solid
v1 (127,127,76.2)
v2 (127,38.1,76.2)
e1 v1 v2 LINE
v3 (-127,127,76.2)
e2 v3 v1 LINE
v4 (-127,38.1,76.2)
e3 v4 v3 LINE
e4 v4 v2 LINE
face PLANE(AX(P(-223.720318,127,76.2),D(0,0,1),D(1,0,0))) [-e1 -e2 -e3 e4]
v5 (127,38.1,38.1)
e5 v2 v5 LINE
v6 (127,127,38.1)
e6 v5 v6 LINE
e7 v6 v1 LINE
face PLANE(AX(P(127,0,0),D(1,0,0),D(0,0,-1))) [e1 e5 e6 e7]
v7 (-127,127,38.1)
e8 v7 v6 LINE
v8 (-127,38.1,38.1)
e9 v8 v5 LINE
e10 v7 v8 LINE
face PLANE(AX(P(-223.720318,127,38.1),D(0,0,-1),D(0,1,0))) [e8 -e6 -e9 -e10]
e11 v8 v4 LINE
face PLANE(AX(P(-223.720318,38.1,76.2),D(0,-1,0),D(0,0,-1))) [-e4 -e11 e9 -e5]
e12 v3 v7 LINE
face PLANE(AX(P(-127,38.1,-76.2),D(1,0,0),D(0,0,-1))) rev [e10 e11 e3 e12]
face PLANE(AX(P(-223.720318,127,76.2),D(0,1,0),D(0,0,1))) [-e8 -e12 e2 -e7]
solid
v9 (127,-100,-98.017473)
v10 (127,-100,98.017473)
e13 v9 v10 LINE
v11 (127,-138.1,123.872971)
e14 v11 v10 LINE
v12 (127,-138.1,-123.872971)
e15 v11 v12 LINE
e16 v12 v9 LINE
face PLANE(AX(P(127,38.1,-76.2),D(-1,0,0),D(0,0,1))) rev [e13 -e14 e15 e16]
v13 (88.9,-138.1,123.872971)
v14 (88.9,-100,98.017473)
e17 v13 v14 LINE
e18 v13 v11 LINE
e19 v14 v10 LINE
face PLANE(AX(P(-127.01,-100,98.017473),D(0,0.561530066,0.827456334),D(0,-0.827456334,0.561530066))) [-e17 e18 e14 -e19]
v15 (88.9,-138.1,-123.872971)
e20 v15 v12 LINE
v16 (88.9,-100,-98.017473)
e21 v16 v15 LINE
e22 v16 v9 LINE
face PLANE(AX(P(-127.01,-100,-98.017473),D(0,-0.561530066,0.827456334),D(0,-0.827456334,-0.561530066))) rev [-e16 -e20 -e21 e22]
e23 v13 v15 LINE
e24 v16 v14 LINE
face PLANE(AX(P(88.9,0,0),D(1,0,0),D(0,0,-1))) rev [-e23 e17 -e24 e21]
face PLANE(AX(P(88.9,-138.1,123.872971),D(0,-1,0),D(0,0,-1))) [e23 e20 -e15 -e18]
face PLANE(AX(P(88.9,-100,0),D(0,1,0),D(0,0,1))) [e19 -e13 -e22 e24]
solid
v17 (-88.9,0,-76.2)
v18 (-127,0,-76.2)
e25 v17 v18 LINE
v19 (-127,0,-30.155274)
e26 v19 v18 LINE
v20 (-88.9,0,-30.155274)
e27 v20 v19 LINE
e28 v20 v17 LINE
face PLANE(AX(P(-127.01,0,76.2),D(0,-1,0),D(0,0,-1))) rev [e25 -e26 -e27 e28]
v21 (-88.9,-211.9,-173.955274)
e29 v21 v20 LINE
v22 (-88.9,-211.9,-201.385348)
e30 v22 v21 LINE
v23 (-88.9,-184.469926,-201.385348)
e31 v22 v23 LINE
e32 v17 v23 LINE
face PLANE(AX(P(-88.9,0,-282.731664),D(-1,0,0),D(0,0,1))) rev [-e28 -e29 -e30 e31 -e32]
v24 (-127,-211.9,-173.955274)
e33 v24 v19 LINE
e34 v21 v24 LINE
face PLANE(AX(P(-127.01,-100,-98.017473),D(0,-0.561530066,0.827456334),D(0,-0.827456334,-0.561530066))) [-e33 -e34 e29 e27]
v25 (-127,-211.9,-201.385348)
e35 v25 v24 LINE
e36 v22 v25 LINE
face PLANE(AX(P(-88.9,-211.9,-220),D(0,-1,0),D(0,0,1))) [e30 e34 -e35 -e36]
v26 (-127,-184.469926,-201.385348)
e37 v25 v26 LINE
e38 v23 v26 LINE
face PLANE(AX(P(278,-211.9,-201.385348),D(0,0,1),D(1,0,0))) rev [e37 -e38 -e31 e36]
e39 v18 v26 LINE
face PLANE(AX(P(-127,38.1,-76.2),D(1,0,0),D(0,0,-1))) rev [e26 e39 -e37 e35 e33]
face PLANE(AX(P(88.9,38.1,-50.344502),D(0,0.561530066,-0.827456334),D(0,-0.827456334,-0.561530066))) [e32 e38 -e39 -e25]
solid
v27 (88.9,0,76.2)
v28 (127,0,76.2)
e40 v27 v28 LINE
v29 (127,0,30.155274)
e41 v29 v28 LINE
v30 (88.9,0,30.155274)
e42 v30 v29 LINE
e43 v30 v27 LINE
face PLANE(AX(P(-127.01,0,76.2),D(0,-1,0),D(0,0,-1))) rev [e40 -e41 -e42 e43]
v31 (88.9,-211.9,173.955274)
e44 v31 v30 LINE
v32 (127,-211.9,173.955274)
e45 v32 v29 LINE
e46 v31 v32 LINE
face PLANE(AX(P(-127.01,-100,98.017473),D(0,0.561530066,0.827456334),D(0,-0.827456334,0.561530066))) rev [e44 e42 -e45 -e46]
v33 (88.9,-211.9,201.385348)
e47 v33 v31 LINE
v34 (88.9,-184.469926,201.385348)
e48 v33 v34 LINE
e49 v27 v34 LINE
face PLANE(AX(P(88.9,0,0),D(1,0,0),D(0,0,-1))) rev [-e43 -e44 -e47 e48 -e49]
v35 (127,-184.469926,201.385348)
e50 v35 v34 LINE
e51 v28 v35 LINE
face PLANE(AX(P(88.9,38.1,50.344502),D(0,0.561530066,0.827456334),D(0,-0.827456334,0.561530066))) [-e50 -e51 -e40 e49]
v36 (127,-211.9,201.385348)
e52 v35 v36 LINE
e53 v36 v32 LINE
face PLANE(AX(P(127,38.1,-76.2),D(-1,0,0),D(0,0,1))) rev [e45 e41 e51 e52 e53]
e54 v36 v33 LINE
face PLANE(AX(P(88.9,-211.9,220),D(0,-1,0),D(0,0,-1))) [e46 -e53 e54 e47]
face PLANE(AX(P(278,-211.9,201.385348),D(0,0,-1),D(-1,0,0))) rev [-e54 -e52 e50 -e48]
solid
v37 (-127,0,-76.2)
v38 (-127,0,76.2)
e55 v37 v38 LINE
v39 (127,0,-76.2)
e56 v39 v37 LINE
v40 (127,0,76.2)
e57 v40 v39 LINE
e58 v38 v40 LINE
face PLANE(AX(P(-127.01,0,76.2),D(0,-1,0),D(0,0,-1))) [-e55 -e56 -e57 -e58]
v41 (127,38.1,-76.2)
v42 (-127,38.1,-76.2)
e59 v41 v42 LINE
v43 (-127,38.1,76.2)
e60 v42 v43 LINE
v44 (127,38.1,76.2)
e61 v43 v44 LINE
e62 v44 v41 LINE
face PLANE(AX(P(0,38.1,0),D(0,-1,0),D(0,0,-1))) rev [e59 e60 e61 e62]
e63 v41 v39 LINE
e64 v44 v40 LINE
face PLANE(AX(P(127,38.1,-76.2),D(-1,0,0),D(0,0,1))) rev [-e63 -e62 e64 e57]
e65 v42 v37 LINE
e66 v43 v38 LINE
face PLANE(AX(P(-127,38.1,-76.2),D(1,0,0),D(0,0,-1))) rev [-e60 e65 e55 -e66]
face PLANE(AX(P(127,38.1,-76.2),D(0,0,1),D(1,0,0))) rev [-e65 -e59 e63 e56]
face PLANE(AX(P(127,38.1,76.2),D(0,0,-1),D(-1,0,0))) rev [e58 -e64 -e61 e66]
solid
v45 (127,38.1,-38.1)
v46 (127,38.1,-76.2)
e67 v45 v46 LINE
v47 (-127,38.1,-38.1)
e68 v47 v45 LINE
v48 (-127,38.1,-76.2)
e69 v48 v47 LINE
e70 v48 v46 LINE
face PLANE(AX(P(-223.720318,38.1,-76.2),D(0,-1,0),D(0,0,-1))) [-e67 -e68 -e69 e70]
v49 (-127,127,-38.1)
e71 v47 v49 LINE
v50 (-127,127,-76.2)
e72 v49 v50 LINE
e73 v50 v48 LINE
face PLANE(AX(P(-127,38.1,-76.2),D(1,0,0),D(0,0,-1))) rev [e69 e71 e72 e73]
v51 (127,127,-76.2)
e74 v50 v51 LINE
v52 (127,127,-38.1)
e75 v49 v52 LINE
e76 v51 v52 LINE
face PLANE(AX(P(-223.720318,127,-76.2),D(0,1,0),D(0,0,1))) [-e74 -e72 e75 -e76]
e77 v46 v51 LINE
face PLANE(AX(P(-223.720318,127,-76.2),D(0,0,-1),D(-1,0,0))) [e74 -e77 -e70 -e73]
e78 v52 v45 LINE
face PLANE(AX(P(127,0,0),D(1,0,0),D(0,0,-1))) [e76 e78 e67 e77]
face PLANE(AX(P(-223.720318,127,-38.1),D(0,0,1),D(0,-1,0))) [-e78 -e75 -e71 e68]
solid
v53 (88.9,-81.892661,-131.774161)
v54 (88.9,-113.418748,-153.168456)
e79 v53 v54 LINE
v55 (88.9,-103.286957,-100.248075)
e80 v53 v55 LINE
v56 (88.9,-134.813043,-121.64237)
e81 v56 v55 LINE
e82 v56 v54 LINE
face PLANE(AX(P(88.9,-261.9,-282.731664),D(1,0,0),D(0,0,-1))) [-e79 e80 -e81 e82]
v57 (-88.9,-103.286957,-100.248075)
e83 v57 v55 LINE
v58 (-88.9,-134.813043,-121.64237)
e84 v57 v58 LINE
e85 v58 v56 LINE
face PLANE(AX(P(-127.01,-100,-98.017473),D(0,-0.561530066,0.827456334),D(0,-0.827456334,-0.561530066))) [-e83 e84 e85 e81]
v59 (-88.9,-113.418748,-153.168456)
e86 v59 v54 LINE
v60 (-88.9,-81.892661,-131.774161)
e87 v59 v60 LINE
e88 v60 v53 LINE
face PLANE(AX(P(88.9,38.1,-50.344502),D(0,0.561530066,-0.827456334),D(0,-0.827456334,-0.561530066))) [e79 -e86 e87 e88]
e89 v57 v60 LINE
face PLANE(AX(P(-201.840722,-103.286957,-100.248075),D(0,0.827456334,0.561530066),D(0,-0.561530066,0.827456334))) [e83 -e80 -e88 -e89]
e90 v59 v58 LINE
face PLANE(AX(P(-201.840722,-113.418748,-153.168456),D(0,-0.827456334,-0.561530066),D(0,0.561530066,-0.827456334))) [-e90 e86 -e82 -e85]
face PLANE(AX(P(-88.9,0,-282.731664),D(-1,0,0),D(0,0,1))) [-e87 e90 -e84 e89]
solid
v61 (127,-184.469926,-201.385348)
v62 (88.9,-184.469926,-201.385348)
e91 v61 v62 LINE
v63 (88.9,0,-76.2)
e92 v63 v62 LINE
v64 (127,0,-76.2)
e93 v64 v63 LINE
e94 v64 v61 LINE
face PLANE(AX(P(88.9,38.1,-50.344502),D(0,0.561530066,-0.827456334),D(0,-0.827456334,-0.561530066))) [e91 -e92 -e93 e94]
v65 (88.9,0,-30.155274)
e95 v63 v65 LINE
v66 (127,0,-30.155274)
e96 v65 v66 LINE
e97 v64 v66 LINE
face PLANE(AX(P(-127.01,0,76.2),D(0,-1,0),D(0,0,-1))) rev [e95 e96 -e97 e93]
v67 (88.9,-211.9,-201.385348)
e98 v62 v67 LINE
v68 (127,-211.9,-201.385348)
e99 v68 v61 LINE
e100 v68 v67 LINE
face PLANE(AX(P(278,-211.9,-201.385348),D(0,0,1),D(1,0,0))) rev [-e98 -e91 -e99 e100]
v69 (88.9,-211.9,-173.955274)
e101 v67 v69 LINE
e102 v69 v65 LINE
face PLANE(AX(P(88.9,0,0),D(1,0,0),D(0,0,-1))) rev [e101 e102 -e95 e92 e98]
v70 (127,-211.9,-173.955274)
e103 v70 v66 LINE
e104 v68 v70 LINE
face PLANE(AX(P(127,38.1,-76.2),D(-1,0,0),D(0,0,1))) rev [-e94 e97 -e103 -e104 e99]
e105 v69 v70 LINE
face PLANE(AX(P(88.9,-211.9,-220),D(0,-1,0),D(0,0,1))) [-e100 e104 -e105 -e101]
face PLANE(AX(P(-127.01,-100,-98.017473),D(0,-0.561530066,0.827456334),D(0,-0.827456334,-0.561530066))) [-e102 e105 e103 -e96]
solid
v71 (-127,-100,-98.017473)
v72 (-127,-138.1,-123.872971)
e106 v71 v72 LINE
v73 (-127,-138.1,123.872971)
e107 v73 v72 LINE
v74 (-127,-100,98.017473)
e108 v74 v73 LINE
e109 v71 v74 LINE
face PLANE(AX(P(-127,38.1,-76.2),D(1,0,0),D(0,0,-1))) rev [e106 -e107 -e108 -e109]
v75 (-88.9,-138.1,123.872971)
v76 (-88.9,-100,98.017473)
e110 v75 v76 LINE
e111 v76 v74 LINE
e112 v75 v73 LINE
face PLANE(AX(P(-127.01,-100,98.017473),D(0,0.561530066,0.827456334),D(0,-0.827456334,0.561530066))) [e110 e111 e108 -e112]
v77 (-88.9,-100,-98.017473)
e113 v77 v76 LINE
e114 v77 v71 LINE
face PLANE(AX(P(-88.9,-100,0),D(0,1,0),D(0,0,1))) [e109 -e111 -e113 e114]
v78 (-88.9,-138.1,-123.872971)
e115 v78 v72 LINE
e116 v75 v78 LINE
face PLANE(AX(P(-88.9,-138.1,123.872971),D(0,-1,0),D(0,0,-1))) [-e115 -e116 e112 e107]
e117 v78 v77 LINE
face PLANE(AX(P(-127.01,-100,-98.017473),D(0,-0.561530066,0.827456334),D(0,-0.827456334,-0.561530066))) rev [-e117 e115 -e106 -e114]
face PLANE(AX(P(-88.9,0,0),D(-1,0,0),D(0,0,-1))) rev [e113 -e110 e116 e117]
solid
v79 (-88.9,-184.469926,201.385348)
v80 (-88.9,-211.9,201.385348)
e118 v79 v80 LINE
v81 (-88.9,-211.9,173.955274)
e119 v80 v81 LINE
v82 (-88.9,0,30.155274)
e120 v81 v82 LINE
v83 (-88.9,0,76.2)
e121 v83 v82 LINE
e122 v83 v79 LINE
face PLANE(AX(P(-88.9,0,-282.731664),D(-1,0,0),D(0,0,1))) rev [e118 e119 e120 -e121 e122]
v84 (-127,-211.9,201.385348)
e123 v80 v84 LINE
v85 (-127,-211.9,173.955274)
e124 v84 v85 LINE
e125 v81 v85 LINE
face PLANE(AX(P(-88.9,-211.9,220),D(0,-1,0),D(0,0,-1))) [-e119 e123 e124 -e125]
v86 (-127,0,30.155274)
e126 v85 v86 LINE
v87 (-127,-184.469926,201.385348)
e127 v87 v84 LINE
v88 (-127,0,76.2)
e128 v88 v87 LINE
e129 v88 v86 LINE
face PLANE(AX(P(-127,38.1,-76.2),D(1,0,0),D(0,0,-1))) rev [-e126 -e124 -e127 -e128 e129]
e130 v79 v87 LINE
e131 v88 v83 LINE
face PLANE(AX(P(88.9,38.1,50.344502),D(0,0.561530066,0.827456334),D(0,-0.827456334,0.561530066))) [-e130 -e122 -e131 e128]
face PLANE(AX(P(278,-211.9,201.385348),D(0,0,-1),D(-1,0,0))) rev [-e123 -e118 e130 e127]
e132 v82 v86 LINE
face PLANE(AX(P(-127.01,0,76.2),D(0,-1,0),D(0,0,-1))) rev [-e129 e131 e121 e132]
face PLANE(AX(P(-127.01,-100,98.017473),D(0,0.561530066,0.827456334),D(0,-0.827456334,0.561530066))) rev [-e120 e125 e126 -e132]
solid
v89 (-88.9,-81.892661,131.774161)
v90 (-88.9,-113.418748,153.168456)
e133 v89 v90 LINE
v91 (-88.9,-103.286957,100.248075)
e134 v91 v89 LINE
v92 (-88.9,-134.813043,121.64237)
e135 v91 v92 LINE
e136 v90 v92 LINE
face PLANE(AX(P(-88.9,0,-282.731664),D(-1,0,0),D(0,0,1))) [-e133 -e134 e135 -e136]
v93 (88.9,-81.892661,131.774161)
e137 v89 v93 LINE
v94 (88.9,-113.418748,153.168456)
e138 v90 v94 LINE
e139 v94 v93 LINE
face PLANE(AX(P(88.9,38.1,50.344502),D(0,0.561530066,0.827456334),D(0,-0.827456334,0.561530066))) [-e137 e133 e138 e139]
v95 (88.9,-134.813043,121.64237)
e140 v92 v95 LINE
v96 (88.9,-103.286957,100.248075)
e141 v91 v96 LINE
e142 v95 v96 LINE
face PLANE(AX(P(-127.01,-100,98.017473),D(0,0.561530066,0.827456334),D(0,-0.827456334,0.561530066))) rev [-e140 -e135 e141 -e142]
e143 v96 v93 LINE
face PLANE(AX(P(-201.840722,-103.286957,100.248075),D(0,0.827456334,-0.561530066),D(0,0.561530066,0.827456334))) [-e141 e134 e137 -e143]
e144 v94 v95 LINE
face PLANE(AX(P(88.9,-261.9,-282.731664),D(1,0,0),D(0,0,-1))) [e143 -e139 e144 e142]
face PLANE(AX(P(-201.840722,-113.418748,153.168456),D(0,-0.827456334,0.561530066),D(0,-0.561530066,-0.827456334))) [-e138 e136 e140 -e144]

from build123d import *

# Parameters (mm, degrees)
SKETCH5_W             = 254
SKETCH5_H             = 152.4
BOSS_EXTRUDE4_DEPTH   = 38.1
BOSS_EXTRUDE3_DEPTH   = 38.1
BOSS_EXTRUDE5_DEPTH   = 254
SKETCH9_W             = 18.614651573
SKETCH9_H             = 27.430074188
CUT_EXTRUDE1_DEPTH    = 405
SPLIT1_OUTLINE_W      = 254
SPLIT1_OUTLINE_H      = 152.4
SPLIT1_DEPTH          = 38.1
SPLIT1_START          = -127
SPLIT1_2_DEPTH        = 38.1
SPLIT1_START_2        = 88.9
SPLIT1_3_DEPTH        = 38.1
SPLIT1_4_DEPTH        = 254
SPLIT1_5_DEPTH        = 254
SPLIT1_6_DEPTH        = 38.1
SPLIT1_7_DEPTH        = 38.1
SPLIT2_START          = -88.9
SPLIT2_DEPTH          = 177.8
SPLIT2_2_DEPTH        = 215.9
SPLIT2_START_2        = 88.9
SPLIT2_3_DEPTH        = 38.1
SPLIT2_4_DEPTH        = 177.8
SPLIT2_START_3        = -127
SPLIT2_5_DEPTH        = 38.1
SPLIT2_6_DEPTH        = 215.9
SKETCH10_W            = 38.1
SKETCH10_H            = 88.9
BOSS_EXTRUDE6_DEPTH   = 254
BOSS_EXTRUDE6_2_DEPTH = 254


# Read off the part's stored shape, not the designer's step: Split1, Split2
with BuildPart() as part:
    # Sketch5 → Boss-Extrude4 (new body)
    with BuildSketch(Plane(origin=(0, 0, 0), x_dir=(1, 0, 0), z_dir=(0, 1, 0))):
        Rectangle(SKETCH5_W, SKETCH5_H)
    extrude(amount=BOSS_EXTRUDE4_DEPTH)


with BuildPart() as body_2:
    # Sketch4 → Boss-Extrude3 (new body)
    with BuildSketch(Plane(origin=(127, 0, 0), x_dir=(0, 0, -1), z_dir=(1, 0, 0))):
        Polygon((0, 38.1), (-50.344502124, 38.1), (-220, -211.9), (-173.955274239, -211.9), (-123.872971266, -138.1), (0, -138.1), (0, -100), (-98.017473389, -100), (-30.155274239, 0), (0, 0), align=None)
    extrude(amount=-BOSS_EXTRUDE3_DEPTH)


with BuildPart() as body_3:
    # Mirror1: mirrored copy
    add(body_2.part.mirror(Plane(origin=(88.9, 0, 0), x_dir=(1, 0, 0), z_dir=(0, 0, -1))))


with BuildPart() as body_4:
    # Mirror2: mirrored copy
    add(body_3.part.mirror(Plane(origin=(0, 0, 0), x_dir=(0, 0, 1), z_dir=(1, 0, 0))))


with BuildPart() as body_5:
    # Mirror2 2: mirrored copy
    add(body_2.part.mirror(Plane(origin=(0, 0, 0), x_dir=(0, 0, 1), z_dir=(1, 0, 0))))


with BuildPart() as body_2_1:
    add(body_2.part)

    add(body_3.part)  # Boss-Extrude5 merges body 3

    add(body_4.part)  # Boss-Extrude5 merges body 4

    add(body_5.part)  # Boss-Extrude5 merges body 5
    # Sketch6 → Boss-Extrude5 (add)
    with BuildSketch(Plane(origin=(127, 0, 0), x_dir=(0, 0, -1), z_dir=(1, 0, 0))):
        Polygon((-131.774160921, -81.89266133), (-153.16845642, -113.418747673), (-121.642370077, -134.813043172), (-100.248074578, -103.286956828), align=None)
        Polygon((131.774160921, -81.89266133), (153.16845642, -113.418747673), (121.642370077, -134.813043172), (100.248074578, -103.286956828), align=None)
    extrude(amount=-BOSS_EXTRUDE5_DEPTH)


with BuildPart() as part_1:
    add(part.part)

    # Combine1: union body 2
    add(body_2_1.part)

    # Sketch9 → Cut-Extrude1 (cut)
    with BuildSketch(Plane.ZY.offset(127)):
        with Locations((-210.692674214, -198.184962906)):
            Rectangle(SKETCH9_W, SKETCH9_H)
        with Locations((210.692674214, -198.184962906)):
            Rectangle(SKETCH9_W, SKETCH9_H)
    extrude(amount=-CUT_EXTRUDE1_DEPTH, mode=Mode.SUBTRACT)

    # Split1 4 outline → Split1 4 (cut)
    with BuildSketch(Plane.YZ.offset(SPLIT1_START)):
        Polygon((38.1, 76.2), (0, 76.2), (0, -30.155274239), (-100, -98.017473389), (-100, 98.017473389), (-138.1, 123.872971266), (-138.1, -123.872971266), (-211.9, -173.955274239), (-211.9, -201.385348427), (-184.469925812, -201.385348427), (0, -76.2), (38.1, -76.2), align=None)
    extrude(amount=SPLIT1_4_DEPTH, mode=Mode.SUBTRACT)

    # Split2 2 outline → Split2 2 (cut)
    with BuildSketch(Plane.YZ.offset(SPLIT2_START)):
        Polygon((0, 30.155274239), (0, 76.2), (-184.469925812, 201.385348427), (-211.9, 201.385348427), (-211.9, 173.955274239), align=None)
    extrude(amount=SPLIT2_2_DEPTH, mode=Mode.SUBTRACT)


with BuildPart() as body_2_2:
    # Split1 outline → Split1 (new body)
    with BuildSketch(Plane(origin=(0, 0, 0), x_dir=(1, 0, 0), z_dir=(0, 1, 0))):
        Rectangle(SPLIT1_OUTLINE_W, SPLIT1_OUTLINE_H)
    extrude(amount=SPLIT1_DEPTH)


with BuildPart() as body_3_2:
    # Split1 2 outline → Split1 2 (new body)
    with BuildSketch(Plane.YZ.offset(SPLIT1_START)):
        Polygon((-138.1, -123.872971266), (-100, -98.017473389), (-100, 98.017473389), (-138.1, 123.872971266), align=None)
    extrude(amount=SPLIT1_2_DEPTH)


with BuildPart() as body_4_2:
    # Split1 3 outline → Split1 3 (new body)
    with BuildSketch(Plane.YZ.offset(SPLIT1_START_2)):
        Polygon((-138.1, -123.872971266), (-100, -98.017473389), (-100, 98.017473389), (-138.1, 123.872971266), align=None)
    extrude(amount=SPLIT1_3_DEPTH)


with BuildPart() as body_5_2:
    # Split1 5 outline → Split1 5 (new body)
    with BuildSketch(Plane.YZ.offset(SPLIT1_START)):
        Polygon((-81.89266133, -131.774160921), (-103.286956828, -100.248074578), (-134.813043172, -121.642370077), (-113.418747673, -153.16845642), align=None)
    extrude(amount=SPLIT1_5_DEPTH)

    # Split1 6 outline → Split1 6 (add)
    with BuildSketch(Plane.YZ.offset(SPLIT1_START)):
        Polygon((0, -76.2), (0, -30.155274239), (-103.286956828, -100.248074578), (-81.89266133, -131.774160921), align=None)
        Polygon((-113.418747673, -153.16845642), (-134.813043172, -121.642370077), (-211.9, -173.955274239), (-211.9, -201.385348427), (-184.469925812, -201.385348427), align=None)
    extrude(amount=SPLIT1_6_DEPTH)

    # Split1 7 outline → Split1 7 (add)
    with BuildSketch(Plane.YZ.offset(SPLIT1_START_2)):
        Polygon((0, -76.2), (0, -30.155274239), (-103.286956828, -100.248074578), (-81.89266133, -131.774160921), align=None)
        Polygon((-113.418747673, -153.16845642), (-134.813043172, -121.642370077), (-211.9, -173.955274239), (-211.9, -201.385348427), (-184.469925812, -201.385348427), align=None)
    extrude(amount=SPLIT1_7_DEPTH)

    # Split2 6 outline → Split2 6 (cut)
    with BuildSketch(Plane.YZ.offset(SPLIT2_START_3)):
        Polygon((0, -76.2), (0, -30.155274239), (-211.9, -173.955274239), (-211.9, -201.385348427), (-184.469925812, -201.385348427), align=None)
    extrude(amount=SPLIT2_6_DEPTH, mode=Mode.SUBTRACT)


with BuildPart() as body_6:
    # Split2 outline → Split2 (new body)
    with BuildSketch(Plane.YZ.offset(SPLIT2_START)):
        Polygon((-103.286956828, 100.248074578), (-81.89266133, 131.774160921), (-113.418747673, 153.16845642), (-134.813043172, 121.642370077), align=None)
    extrude(amount=SPLIT2_DEPTH)


with BuildPart() as body_7:
    # Split2 3 outline → Split2 3 (new body)
    with BuildSketch(Plane.YZ.offset(SPLIT2_START_2)):
        Polygon((-184.469925812, 201.385348427), (-211.9, 201.385348427), (-211.9, 173.955274239), (0, 30.155274239), (0, 76.2), align=None)
    extrude(amount=SPLIT2_3_DEPTH)


with BuildPart() as body_8:
    # Split2 4 outline → Split2 4 (new body)
    with BuildSketch(Plane.YZ.offset(SPLIT2_START)):
        Polygon((-134.813043172, -121.642370077), (-113.418747673, -153.16845642), (-81.89266133, -131.774160921), (-103.286956828, -100.248074578), align=None)
    extrude(amount=SPLIT2_4_DEPTH)


with BuildPart() as body_9:
    # Split2 5 outline → Split2 5 (new body)
    with BuildSketch(Plane.YZ.offset(SPLIT2_START_3)):
        Polygon((0, -76.2), (0, -30.155274239), (-211.9, -173.955274239), (-211.9, -201.385348427), (-184.469925812, -201.385348427), align=None)
    extrude(amount=SPLIT2_5_DEPTH)


with BuildPart() as body_10:
    # Sketch10 → Boss-Extrude6 (new body)
    with BuildSketch(Plane(origin=(127, 0, 0), x_dir=(0, 0, -1), z_dir=(1, 0, 0))):
        with Locations((-57.15, 82.55)):
            Rectangle(SKETCH10_W, SKETCH10_H)
    extrude(amount=-BOSS_EXTRUDE6_DEPTH)


with BuildPart() as body_11:
    # Sketch10 → Boss-Extrude6 2 (new body)
    with BuildSketch(Plane(origin=(127, 0, 0), x_dir=(0, 0, -1), z_dir=(1, 0, 0))):
        with Locations((57.15, 82.55)):
            Rectangle(SKETCH10_W, SKETCH10_H)
    extrude(amount=-BOSS_EXTRUDE6_2_DEPTH)


solid = Compound([part_1.part, body_2_2.part, body_3_2.part, body_4_2.part, body_5_2.part, body_6.part, body_7.part, body_8.part, body_9.part, body_10.part, body_11.part])
